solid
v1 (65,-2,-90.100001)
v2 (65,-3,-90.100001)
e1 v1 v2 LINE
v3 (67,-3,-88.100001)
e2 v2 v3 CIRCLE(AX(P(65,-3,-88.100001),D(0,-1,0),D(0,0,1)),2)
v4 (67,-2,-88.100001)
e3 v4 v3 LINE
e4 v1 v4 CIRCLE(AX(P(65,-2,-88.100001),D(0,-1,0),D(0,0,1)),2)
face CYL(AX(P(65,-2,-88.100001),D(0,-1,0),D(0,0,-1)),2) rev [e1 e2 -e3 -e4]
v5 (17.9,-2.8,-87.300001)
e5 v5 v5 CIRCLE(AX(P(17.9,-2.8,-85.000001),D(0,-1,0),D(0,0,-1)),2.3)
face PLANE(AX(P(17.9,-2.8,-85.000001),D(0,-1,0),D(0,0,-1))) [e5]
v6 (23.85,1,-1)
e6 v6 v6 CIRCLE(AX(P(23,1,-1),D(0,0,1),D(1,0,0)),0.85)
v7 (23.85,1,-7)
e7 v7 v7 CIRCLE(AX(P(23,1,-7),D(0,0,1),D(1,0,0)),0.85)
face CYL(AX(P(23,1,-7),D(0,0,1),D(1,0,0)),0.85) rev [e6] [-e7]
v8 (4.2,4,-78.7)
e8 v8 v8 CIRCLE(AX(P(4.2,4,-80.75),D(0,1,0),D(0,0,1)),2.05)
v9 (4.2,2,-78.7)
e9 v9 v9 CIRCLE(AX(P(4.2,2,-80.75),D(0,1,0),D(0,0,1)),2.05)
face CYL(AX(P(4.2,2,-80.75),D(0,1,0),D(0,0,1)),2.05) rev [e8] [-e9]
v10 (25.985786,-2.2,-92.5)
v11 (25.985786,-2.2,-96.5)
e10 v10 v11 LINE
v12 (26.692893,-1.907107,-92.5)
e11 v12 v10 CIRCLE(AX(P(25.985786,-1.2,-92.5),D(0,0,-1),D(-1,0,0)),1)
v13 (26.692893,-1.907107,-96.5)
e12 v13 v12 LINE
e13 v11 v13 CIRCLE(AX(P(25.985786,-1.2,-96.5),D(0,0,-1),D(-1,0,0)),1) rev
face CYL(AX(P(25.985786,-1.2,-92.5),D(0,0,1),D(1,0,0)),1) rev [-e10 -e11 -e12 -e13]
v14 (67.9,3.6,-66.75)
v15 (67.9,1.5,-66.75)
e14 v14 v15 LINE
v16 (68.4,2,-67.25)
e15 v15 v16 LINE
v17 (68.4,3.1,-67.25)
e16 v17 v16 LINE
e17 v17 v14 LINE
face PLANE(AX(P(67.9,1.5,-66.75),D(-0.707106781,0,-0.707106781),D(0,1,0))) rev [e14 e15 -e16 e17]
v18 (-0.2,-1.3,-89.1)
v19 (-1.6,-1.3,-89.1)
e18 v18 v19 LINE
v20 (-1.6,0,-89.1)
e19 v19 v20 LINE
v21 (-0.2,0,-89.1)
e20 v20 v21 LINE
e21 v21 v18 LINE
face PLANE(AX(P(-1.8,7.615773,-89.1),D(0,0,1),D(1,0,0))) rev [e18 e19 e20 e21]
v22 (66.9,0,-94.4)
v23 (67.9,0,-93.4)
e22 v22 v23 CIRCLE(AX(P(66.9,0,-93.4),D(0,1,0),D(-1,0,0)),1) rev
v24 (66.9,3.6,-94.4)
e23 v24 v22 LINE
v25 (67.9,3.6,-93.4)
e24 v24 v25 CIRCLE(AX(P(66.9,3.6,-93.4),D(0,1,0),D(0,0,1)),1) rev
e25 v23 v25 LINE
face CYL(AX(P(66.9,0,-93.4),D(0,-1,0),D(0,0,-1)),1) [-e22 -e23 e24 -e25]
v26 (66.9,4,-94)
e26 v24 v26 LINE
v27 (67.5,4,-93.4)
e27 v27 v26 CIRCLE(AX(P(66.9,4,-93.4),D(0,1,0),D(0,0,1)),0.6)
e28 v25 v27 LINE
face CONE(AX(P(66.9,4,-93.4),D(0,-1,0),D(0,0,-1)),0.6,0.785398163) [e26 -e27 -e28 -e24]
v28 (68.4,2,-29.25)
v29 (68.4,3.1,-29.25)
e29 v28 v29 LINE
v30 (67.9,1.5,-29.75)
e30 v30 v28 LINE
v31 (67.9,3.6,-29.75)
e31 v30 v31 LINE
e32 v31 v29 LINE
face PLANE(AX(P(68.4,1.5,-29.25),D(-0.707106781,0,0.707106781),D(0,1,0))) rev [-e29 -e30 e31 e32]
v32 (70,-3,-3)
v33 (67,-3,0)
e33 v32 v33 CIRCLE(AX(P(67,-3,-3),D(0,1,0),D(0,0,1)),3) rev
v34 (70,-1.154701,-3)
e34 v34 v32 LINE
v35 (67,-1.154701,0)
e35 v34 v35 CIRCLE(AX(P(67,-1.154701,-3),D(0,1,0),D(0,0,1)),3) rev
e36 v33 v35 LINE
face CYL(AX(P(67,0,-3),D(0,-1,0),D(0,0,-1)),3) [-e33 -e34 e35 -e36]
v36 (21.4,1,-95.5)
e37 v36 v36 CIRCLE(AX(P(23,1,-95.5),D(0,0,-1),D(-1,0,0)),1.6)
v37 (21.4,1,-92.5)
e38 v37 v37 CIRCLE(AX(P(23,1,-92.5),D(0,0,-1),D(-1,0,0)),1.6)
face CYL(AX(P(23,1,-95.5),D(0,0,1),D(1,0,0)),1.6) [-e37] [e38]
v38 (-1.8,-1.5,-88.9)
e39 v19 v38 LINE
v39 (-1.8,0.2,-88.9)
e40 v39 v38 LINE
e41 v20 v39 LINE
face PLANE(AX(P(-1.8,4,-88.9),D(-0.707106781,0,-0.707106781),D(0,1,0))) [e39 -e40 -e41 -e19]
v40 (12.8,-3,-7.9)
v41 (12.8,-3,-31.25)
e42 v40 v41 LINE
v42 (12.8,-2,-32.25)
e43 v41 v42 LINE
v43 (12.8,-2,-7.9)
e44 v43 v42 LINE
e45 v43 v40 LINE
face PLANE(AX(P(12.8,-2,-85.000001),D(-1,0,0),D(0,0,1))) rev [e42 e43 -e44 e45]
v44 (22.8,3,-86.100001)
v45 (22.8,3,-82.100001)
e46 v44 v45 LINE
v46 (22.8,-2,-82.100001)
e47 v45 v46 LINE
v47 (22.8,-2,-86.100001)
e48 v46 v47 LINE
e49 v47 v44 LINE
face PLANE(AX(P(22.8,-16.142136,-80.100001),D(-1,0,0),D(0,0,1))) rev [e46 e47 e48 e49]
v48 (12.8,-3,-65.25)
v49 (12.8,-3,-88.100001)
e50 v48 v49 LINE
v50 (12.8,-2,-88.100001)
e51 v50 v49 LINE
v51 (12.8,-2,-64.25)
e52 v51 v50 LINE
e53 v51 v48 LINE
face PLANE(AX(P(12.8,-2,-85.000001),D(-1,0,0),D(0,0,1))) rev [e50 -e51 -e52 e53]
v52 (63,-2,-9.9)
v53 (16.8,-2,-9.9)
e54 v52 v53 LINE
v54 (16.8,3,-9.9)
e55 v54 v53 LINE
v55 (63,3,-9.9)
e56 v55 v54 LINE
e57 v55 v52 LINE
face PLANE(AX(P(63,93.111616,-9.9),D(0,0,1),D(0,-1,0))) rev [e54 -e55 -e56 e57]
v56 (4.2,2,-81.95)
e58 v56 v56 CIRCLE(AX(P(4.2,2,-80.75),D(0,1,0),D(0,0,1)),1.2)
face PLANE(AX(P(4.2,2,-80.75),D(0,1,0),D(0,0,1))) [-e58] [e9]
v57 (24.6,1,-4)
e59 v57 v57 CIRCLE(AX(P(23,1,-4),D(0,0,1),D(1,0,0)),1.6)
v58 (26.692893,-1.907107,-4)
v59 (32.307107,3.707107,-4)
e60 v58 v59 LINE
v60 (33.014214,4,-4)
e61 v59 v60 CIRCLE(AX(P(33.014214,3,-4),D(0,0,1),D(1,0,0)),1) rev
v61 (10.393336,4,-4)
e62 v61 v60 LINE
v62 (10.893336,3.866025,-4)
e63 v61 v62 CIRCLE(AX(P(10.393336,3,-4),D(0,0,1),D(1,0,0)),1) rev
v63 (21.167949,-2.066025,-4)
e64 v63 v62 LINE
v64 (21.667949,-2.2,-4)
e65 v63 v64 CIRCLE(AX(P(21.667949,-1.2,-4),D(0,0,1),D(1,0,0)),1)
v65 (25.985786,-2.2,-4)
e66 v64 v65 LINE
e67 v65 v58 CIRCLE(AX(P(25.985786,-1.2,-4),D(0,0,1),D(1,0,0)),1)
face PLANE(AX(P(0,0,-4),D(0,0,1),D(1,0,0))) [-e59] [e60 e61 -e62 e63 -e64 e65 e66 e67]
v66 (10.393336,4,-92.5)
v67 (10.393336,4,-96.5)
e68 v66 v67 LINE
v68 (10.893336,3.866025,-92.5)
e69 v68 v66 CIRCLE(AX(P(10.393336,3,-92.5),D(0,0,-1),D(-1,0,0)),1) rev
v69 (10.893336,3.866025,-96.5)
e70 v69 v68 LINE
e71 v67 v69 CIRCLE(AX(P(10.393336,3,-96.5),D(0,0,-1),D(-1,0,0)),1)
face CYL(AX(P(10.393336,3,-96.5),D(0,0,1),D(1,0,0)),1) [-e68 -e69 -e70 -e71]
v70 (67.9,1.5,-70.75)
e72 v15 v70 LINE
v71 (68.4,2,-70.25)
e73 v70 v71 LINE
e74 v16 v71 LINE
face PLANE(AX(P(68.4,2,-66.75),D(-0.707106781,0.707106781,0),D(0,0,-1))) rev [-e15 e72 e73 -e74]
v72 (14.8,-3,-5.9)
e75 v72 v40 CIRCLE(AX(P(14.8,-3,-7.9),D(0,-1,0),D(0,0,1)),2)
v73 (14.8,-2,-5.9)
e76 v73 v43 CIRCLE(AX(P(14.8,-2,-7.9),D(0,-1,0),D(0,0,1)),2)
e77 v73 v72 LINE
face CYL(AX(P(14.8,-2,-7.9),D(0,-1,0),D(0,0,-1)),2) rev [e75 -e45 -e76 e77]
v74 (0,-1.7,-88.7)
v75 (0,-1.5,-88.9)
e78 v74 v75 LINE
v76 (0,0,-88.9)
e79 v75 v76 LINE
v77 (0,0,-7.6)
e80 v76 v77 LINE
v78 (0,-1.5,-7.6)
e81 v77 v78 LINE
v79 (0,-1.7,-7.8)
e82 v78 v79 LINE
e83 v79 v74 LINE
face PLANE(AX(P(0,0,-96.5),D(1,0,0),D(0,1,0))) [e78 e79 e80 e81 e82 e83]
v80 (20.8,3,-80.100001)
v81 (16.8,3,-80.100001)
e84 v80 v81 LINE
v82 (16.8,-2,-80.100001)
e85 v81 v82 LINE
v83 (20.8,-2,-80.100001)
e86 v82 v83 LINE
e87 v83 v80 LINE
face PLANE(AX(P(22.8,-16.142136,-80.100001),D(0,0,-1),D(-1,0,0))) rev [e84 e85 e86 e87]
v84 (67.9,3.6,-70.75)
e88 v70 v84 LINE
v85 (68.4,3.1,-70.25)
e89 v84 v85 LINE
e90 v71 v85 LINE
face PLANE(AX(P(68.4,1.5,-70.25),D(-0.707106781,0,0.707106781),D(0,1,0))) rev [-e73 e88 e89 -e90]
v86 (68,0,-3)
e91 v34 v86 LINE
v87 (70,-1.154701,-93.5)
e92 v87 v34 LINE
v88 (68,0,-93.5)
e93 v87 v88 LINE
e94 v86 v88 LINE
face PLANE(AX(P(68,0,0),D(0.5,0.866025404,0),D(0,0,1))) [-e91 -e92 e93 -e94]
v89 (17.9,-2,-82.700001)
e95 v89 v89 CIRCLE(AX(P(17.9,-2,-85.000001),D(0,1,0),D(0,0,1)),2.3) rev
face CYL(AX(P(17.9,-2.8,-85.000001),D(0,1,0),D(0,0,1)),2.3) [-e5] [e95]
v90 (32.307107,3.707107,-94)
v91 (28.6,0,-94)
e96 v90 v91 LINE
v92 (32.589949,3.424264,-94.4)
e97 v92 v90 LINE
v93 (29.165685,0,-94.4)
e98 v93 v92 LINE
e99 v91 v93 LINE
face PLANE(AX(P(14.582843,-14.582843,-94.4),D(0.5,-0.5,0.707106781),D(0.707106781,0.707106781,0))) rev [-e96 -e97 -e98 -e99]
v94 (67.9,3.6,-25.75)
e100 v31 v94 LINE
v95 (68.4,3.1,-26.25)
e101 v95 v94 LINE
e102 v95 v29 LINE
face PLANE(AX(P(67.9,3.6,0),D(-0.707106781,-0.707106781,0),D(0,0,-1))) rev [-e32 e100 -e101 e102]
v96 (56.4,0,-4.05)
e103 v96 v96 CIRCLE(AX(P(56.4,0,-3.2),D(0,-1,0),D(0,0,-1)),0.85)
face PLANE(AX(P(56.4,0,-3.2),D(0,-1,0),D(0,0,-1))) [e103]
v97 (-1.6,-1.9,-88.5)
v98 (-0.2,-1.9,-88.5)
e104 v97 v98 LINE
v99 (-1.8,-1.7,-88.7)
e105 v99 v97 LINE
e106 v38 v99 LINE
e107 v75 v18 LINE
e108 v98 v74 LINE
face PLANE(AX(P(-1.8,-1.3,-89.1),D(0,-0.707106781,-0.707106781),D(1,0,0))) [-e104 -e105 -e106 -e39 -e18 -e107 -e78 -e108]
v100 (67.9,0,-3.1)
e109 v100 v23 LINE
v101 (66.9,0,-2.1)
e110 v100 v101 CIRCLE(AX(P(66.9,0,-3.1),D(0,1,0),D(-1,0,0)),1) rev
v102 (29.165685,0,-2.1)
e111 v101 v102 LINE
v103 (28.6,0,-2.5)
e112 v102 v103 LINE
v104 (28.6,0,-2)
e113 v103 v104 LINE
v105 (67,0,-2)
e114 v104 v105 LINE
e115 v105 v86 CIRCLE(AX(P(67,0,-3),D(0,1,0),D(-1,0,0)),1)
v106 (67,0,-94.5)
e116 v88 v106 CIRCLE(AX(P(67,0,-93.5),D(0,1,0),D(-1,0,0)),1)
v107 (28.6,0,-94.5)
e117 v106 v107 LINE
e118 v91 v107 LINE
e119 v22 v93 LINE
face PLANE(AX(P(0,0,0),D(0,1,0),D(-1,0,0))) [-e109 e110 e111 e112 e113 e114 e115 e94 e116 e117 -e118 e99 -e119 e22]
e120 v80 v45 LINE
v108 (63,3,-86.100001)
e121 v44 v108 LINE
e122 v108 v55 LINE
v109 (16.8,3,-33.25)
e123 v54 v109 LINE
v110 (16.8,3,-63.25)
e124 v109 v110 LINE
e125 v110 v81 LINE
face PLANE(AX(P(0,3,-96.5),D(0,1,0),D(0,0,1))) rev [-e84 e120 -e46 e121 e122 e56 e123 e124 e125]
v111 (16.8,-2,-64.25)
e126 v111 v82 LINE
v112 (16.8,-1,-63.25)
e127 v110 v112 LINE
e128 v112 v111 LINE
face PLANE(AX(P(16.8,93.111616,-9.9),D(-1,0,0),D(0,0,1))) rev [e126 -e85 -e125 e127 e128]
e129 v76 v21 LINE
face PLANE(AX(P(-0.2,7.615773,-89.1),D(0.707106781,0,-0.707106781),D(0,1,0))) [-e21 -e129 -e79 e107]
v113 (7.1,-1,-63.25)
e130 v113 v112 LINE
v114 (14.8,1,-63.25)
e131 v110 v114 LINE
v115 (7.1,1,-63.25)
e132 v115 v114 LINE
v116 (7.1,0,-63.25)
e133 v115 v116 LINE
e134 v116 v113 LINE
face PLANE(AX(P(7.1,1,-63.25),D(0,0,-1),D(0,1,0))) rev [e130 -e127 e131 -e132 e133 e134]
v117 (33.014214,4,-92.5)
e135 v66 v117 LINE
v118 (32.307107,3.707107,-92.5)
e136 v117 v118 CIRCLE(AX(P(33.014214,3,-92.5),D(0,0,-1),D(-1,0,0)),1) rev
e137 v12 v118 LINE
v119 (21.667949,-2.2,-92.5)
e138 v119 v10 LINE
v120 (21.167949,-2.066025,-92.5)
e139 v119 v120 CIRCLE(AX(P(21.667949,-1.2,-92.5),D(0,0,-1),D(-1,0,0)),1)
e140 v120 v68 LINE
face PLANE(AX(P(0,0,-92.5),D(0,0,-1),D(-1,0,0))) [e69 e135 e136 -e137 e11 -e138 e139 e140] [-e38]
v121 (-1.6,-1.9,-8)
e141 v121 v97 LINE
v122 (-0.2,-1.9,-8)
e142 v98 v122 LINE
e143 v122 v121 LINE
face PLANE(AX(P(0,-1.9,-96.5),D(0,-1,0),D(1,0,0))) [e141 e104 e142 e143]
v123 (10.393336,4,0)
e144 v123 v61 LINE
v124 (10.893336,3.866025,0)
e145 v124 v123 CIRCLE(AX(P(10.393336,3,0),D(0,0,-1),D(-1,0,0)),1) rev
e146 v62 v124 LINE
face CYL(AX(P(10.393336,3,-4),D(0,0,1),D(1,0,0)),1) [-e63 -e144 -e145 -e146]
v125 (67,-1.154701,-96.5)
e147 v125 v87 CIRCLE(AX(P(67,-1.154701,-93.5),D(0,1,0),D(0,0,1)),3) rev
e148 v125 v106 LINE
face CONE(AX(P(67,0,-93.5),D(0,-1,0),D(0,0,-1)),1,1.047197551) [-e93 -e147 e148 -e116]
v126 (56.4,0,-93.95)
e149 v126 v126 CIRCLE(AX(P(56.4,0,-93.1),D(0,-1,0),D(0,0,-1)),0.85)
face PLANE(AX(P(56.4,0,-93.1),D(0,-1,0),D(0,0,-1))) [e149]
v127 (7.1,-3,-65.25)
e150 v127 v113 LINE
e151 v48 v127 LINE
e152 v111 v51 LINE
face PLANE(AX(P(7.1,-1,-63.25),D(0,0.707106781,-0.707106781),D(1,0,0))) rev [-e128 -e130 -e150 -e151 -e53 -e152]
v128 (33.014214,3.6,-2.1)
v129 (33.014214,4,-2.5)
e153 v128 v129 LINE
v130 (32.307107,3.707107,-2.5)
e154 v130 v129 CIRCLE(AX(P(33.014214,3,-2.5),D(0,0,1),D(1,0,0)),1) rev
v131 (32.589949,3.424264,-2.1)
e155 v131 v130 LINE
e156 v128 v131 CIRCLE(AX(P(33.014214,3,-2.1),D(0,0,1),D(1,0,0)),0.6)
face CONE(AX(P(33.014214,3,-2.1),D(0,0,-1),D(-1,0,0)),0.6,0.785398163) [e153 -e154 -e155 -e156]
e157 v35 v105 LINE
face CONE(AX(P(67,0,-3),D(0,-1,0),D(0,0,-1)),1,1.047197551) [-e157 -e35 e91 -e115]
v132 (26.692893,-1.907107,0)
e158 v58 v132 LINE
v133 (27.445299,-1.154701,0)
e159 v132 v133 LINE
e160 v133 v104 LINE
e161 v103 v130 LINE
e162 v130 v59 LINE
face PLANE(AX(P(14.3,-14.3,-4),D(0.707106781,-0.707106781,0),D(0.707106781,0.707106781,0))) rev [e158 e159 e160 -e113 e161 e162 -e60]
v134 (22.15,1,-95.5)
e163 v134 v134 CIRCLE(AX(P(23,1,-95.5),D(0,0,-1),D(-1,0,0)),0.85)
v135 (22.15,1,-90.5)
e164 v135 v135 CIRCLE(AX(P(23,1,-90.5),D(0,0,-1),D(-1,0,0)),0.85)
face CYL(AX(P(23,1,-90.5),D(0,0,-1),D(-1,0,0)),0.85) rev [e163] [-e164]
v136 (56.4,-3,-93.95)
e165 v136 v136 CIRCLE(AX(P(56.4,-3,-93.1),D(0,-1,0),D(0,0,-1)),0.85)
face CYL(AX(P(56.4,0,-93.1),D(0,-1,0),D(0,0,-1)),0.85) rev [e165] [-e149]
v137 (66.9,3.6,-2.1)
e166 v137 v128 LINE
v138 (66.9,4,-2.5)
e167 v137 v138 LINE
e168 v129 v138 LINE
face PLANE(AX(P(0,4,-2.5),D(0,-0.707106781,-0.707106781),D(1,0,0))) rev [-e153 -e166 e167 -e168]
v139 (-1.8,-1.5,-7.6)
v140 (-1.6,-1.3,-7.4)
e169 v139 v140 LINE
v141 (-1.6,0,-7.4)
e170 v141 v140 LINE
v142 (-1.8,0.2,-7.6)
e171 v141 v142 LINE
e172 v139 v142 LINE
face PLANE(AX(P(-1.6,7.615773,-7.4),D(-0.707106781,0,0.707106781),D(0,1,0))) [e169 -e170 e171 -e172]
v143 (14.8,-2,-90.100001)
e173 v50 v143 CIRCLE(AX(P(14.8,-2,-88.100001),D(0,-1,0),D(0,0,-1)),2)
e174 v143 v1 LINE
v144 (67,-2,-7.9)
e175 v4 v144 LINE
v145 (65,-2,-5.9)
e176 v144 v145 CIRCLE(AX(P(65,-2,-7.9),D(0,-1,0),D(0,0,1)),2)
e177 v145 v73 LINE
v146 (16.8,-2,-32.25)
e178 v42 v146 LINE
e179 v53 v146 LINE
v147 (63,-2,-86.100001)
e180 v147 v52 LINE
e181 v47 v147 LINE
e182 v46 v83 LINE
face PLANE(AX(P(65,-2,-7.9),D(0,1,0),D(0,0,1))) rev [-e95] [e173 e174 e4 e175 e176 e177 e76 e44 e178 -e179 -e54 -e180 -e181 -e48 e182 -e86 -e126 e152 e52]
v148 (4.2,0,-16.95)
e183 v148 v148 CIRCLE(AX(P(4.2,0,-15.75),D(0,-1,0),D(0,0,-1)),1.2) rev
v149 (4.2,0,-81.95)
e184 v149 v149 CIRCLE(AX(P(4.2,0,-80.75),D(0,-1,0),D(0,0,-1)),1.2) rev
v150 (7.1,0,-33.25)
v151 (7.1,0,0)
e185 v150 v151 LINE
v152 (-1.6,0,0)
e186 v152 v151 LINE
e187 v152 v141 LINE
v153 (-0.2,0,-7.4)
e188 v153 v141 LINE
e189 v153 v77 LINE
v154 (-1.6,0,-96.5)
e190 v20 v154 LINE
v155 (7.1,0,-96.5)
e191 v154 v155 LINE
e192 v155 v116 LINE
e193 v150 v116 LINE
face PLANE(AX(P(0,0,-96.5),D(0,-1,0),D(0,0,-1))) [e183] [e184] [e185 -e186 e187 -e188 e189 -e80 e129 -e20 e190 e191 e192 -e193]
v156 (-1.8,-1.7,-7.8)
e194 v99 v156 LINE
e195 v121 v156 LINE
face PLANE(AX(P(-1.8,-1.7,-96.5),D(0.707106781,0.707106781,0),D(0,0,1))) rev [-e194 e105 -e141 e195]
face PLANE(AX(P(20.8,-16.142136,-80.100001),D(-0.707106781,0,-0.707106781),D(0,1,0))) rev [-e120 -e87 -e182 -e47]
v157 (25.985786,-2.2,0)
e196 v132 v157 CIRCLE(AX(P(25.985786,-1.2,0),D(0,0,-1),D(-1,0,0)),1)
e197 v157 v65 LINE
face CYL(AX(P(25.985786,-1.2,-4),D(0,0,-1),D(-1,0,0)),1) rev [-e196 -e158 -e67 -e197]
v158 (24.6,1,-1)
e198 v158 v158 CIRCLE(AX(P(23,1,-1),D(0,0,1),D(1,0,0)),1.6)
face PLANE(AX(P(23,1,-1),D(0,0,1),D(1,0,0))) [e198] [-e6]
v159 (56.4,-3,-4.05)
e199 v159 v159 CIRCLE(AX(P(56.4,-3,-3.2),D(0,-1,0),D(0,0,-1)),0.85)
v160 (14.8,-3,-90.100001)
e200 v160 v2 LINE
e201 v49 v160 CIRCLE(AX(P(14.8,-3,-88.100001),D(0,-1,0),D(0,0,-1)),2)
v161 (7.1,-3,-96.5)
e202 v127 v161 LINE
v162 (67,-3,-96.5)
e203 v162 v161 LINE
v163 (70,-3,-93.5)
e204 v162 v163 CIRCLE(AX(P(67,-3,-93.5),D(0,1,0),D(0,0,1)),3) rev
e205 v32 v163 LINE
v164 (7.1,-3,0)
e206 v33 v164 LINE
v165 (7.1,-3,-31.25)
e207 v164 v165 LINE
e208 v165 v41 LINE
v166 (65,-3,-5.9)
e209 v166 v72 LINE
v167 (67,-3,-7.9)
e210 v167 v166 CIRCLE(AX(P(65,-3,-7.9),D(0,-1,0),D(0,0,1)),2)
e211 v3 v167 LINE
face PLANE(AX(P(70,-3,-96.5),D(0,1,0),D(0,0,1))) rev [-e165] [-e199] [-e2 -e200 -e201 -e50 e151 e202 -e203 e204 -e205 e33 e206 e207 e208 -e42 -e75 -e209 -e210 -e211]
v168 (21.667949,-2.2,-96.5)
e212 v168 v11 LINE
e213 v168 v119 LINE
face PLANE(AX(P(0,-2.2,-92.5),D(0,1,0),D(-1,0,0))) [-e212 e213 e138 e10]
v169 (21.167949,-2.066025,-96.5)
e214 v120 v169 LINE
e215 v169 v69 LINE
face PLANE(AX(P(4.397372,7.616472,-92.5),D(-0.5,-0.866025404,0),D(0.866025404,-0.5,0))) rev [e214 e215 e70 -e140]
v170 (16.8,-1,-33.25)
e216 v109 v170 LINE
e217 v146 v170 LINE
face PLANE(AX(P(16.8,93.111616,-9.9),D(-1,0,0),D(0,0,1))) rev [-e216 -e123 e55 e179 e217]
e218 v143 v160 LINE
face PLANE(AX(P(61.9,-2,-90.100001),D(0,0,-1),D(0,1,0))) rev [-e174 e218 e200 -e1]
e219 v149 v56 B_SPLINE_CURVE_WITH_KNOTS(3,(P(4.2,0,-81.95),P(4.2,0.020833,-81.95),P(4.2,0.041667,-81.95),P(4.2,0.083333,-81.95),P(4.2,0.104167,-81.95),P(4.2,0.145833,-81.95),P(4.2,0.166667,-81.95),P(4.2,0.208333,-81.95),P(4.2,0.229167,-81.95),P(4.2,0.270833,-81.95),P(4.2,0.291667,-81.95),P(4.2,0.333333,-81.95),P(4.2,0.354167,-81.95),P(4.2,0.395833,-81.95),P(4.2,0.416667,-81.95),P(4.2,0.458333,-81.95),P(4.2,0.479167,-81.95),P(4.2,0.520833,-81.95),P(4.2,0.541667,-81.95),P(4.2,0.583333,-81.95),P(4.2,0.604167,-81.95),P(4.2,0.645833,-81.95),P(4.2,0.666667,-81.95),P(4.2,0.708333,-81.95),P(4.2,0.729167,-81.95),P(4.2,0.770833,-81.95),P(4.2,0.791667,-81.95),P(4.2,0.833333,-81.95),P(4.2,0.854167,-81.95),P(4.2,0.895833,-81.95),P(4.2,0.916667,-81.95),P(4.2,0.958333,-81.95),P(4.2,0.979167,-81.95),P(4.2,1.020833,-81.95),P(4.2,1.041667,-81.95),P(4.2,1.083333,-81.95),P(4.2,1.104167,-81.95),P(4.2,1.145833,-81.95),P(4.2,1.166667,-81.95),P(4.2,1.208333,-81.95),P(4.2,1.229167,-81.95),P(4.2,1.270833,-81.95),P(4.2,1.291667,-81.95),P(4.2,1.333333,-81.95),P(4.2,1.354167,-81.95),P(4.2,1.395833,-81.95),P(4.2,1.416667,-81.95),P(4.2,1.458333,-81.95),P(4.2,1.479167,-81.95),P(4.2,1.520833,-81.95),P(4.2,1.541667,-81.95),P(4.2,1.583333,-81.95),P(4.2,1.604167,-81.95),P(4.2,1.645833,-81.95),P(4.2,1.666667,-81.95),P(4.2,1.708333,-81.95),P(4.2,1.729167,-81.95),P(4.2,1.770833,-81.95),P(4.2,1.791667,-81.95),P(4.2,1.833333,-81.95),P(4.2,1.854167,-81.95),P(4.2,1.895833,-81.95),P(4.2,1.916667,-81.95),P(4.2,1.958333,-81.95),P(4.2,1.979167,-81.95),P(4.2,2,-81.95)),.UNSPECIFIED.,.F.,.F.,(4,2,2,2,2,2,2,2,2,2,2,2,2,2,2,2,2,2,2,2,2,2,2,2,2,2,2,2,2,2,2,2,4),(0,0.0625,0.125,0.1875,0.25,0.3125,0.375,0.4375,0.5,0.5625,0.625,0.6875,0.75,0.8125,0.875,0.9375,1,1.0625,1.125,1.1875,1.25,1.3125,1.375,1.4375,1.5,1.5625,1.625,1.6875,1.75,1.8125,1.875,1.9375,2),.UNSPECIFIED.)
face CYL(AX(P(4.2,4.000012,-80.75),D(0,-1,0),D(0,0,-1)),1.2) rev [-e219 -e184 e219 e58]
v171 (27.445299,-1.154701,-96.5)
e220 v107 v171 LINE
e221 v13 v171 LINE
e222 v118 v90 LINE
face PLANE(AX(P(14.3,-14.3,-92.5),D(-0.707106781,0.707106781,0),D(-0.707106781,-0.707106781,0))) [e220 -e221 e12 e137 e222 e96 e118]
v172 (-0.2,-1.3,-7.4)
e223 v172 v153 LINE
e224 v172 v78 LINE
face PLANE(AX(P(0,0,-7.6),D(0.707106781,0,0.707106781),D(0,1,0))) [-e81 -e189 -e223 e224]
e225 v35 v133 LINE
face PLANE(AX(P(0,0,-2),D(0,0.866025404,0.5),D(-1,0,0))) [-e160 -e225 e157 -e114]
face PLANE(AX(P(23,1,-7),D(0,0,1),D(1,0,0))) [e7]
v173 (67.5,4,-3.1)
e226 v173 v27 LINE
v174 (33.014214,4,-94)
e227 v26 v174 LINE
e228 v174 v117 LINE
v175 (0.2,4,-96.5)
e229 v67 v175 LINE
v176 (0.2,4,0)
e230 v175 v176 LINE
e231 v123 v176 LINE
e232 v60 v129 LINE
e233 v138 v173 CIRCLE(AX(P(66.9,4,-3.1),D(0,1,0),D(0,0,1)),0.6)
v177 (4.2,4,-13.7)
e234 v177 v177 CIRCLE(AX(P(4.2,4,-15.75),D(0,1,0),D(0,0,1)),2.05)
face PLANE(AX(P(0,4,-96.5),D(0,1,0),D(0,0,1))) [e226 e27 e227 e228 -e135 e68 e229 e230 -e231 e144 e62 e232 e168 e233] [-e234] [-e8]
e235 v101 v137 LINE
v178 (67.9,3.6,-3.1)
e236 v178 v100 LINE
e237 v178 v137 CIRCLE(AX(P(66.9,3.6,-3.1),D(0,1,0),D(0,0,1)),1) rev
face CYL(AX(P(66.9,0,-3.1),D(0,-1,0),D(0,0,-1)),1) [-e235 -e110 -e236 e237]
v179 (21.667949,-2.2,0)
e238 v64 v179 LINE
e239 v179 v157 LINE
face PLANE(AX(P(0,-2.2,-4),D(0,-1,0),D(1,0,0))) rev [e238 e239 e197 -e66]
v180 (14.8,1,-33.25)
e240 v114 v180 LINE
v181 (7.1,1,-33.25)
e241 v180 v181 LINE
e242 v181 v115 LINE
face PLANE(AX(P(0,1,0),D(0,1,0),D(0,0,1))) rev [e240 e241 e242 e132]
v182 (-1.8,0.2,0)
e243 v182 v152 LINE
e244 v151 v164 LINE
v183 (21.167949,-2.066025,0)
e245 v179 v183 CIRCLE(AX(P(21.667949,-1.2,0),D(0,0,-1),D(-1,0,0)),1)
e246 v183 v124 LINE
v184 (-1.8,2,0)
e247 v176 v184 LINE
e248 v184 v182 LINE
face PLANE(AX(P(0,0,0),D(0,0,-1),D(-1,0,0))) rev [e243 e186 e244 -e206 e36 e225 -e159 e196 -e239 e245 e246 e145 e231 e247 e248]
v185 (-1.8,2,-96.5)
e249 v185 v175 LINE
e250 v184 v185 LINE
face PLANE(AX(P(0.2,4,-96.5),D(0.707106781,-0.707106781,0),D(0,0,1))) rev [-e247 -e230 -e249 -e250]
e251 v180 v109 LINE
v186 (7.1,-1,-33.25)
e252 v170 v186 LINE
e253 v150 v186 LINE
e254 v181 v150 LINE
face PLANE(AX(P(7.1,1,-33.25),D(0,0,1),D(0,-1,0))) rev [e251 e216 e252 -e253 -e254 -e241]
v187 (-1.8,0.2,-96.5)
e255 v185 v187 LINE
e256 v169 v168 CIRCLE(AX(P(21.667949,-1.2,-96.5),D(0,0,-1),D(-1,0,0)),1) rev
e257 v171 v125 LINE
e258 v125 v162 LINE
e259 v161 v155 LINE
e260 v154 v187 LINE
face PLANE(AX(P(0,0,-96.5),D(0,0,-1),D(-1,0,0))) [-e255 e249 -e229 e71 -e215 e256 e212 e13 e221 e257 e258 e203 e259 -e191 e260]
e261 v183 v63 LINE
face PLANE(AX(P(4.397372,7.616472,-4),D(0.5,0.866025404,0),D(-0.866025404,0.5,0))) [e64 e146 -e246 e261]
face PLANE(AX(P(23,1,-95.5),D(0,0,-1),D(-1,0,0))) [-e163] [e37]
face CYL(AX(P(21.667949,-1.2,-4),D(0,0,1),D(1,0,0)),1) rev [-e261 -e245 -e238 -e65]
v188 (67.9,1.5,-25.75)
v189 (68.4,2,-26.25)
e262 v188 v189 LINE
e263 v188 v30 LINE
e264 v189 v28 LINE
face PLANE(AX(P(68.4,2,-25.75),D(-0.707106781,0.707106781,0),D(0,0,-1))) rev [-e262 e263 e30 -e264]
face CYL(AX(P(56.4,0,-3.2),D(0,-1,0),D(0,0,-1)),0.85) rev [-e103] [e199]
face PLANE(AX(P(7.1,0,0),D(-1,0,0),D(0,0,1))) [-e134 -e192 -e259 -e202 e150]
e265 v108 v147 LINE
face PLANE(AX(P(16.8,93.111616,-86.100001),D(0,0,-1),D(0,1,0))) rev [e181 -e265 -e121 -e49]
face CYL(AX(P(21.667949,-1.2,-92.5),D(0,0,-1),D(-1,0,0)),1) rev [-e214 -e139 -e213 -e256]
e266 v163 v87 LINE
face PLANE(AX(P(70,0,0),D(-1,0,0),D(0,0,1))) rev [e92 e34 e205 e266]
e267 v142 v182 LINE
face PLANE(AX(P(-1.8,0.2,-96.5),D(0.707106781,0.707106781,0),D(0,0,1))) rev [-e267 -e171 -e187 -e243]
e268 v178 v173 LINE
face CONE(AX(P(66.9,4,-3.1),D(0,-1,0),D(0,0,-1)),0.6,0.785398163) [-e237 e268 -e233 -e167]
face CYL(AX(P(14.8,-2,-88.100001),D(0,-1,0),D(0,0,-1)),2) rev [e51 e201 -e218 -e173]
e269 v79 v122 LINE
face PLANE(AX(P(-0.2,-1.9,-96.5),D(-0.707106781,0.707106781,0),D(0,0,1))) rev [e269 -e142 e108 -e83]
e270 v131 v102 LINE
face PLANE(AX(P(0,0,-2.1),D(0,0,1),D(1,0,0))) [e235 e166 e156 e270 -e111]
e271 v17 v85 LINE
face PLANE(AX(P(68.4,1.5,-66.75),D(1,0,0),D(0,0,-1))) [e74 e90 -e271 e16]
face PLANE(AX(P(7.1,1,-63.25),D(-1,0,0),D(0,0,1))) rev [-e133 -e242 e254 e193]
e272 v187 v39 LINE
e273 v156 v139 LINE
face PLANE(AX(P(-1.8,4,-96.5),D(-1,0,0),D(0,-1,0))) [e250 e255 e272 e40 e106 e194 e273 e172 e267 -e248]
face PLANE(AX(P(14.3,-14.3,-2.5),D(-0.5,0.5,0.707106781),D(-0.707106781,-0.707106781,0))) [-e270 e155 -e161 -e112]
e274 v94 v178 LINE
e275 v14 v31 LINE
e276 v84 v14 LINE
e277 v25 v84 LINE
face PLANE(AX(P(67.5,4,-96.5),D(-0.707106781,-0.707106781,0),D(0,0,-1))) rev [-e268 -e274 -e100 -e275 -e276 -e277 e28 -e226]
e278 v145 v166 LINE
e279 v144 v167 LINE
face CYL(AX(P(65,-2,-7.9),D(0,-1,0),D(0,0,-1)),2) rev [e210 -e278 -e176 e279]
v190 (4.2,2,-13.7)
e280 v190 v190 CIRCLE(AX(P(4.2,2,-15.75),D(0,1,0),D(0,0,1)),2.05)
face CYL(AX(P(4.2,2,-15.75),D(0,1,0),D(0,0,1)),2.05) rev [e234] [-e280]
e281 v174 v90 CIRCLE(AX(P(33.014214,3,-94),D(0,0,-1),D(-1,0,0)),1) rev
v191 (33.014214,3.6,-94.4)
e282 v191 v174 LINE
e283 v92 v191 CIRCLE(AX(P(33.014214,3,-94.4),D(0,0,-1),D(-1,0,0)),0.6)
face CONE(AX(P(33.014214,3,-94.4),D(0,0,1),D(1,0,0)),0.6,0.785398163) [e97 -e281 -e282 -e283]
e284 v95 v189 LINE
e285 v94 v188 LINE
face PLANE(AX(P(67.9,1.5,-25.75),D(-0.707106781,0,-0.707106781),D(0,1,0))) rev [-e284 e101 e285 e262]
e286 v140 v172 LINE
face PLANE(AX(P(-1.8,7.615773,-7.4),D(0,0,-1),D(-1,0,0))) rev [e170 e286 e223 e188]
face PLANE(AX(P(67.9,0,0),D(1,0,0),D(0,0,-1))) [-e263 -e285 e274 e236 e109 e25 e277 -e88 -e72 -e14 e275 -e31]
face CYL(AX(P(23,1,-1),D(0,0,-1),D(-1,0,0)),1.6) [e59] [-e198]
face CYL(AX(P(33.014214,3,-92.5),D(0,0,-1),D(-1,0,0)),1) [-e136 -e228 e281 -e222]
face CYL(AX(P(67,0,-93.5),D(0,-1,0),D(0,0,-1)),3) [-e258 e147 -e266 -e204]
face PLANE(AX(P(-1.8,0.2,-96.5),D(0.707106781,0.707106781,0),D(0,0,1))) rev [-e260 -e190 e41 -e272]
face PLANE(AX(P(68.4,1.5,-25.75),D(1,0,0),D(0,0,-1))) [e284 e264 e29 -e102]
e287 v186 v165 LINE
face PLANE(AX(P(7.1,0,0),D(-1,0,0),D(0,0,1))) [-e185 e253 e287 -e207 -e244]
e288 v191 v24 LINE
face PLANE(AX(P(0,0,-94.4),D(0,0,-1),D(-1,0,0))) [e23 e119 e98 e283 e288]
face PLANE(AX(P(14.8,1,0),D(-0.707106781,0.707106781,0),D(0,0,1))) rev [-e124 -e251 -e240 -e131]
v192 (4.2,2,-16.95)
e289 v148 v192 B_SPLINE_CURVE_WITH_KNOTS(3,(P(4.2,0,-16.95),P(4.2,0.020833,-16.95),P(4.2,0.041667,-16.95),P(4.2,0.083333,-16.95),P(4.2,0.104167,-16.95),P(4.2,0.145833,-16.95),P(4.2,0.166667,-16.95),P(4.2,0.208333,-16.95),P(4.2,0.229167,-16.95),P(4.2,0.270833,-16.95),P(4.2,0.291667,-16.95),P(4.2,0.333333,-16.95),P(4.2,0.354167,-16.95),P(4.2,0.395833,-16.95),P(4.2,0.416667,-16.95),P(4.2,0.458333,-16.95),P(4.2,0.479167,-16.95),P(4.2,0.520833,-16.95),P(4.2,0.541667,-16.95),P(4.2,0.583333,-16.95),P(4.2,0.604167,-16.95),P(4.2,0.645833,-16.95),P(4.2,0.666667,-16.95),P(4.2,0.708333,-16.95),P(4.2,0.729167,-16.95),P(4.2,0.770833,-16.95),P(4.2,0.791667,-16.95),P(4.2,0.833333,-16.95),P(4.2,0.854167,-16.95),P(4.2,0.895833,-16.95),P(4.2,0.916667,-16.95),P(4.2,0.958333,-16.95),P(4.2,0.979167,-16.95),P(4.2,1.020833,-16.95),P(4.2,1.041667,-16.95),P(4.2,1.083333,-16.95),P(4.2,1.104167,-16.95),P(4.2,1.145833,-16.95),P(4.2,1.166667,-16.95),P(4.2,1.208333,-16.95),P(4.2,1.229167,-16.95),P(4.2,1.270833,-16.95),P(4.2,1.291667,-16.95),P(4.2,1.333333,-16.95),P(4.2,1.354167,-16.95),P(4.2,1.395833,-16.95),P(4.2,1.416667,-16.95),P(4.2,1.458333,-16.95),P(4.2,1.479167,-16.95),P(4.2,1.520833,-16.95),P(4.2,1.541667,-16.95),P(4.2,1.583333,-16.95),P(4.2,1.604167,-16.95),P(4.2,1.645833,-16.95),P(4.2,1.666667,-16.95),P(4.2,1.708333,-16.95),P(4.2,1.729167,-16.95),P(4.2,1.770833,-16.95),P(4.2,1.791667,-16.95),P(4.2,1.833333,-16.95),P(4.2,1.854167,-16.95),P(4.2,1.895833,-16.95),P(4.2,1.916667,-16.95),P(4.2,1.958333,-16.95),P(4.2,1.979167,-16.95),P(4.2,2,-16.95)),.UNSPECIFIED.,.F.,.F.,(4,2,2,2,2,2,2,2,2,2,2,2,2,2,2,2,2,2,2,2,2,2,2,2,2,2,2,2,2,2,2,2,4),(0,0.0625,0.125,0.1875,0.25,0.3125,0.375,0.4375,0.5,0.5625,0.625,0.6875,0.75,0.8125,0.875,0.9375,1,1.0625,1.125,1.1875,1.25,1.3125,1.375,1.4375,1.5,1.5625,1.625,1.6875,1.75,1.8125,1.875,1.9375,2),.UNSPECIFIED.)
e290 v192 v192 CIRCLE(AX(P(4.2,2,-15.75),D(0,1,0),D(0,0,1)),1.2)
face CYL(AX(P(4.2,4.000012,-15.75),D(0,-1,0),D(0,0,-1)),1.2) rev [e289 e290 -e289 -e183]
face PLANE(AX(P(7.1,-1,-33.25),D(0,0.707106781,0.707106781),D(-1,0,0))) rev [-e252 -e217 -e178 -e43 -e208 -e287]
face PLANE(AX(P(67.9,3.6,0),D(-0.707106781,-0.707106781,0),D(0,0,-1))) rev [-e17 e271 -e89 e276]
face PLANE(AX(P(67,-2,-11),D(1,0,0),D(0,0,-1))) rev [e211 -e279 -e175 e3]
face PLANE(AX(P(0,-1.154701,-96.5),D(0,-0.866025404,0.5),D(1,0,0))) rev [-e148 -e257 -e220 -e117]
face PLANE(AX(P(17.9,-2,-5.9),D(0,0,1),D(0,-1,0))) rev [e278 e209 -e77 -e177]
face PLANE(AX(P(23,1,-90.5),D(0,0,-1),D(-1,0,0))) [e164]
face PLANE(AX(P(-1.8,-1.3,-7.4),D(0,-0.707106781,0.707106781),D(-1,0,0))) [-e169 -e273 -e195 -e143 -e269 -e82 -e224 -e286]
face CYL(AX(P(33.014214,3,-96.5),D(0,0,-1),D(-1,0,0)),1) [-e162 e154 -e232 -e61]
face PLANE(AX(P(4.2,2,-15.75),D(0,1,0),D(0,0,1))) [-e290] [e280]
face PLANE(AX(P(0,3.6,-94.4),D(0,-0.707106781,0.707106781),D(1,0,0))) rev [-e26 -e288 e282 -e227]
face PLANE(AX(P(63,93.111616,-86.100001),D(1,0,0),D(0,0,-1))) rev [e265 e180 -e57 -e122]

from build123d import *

# Parameters (mm, degrees)
EXTRUDE_1_DEPTH          = 96.5
CUT_EXTRUDE_1_DEPTH      = 97.940548792
CUT_EXTRUDE_1_DEPTH_BACK = 10
SKETCH_2_R               = 1.2
SKETCH_2_3_R             = 2.05
CUT_EXTRUDE_2_DEPTH      = 2
CHAMFER_3_SIZE           = 2
SKETCH_3_W               = 1.8
SKETCH_3_H               = 7.4
CUT_EXTRUDE_3_DEPTH      = 1.9
CHAMFER_4_SIZE           = 0.2
CHAMFER_5_SIZE           = 0.6
SKETCH_5_W               = 96.5
SKETCH_5_H               = 7
EXTRUDE_3_DEPTH          = 62.9
CUT_EXTRUDE_4_DEPTH      = 1
SKETCH_7_W               = 2.1
SKETCH_7_H               = 4
CUT_EXTRUDE_5_DEPTH      = 120.282228349
CUT_EXTRUDE_6_DEPTH      = 2.1
SKETCH_7_4_R             = 1.6
SKETCH_7_4_R_2           = 0.85
CUT_EXTRUDE_7_DEPTH      = 4
CUT_EXTRUDE_START        = -96.5
CUT_EXTRUDE_8_DEPTH      = 2.1
CUT_EXTRUDE_9_DEPTH      = 4
FILLET_1_R               = 3
FILLET_2_R               = 1
CHAMFER_6_SIZE           = 2
CHAMFER_6_SIZE2          = 1.154700538
FILLET_3_R               = 1
EXTRUDE_START            = -4
SKETCH_7_9_R             = 1.6
EXTRUDE_4_DEPTH          = 3
SKETCH_7_10_R            = 0.85
CUT_EXTRUDE_10_DEPTH     = 6
EXTRUDE_START_2          = -92.5
SKETCH_7_11_R            = 1.6
SKETCH_7_11_R_2          = 0.85
EXTRUDE_5_DEPTH          = 3
CUT_EXTRUDE_START_2      = -89.5
SKETCH_7_12_R            = 0.85
CUT_EXTRUDE_11_DEPTH     = 6
SKETCH_8_W               = 46.199999762
SKETCH_8_H               = 76.200000954
CUT_EXTRUDE_12_DEPTH     = 5
CHAMFER_7_SIZE           = 0.4
SKETCH_10_W              = 9.700000238
SKETCH_10_H              = 30
CUT_EXTRUDE_13_DEPTH     = 4
CHAMFER_8_SIZE           = 2
SKETCH_12_W              = 10
SKETCH_12_H              = 10
EXTRUDE_6_DEPTH          = 5
CHAMFER_9_SIZE           = 2
SKETCH_13_R              = 2.3
EXTRUDE_7_DEPTH          = 0.8
SKETCH_14_R              = 0.85
CUT_EXTRUDE_14_DEPTH     = 3
EXTRUDE_START_3          = -0.9
SKETCH_15_W              = 5
SKETCH_15_H              = 4
EXTRUDE_8_DEPTH          = 1.6
CHAMFER_10_SIZE          = 0.5
CHAMFER_11_SIZE          = 0.5


# Read off the part's stored shape, not the designer's step: 切除-拉伸9
# Some blends are built 0.0001 mm under size
with BuildPart() as part:
    # 草图1 → 凸台-拉伸1 (new body)
    with BuildSketch(Plane.XY):
        Polygon((0, 0), (7.1, 0), (7.1, 4), (0, 4), (-1.8, 4), (-1.8, -1.9), (0, -1.9), align=None)
    extrude(amount=-EXTRUDE_1_DEPTH)

    # 草图2 → 切除-拉伸1 (cut, two sides: drawn at the far end of the back side and taken through both)
    with BuildSketch(Plane(origin=(0, 4, 0), x_dir=(1, 0, 0), z_dir=(0, 1, 0)).offset(-CUT_EXTRUDE_1_DEPTH_BACK)):
        with Locations(Location((4.2, 80.75, 0), (0, 0, 90))):
            Circle(SKETCH_2_R)
        with Locations(Location((4.2, 15.75, 0), (0, 0, 90))):
            Circle(SKETCH_2_R)
    extrude(amount=CUT_EXTRUDE_1_DEPTH + CUT_EXTRUDE_1_DEPTH_BACK, mode=Mode.SUBTRACT)

    # 草图2<3> → 切除-拉伸2 (cut)
    with BuildSketch(Plane(origin=(0, 4, 0), x_dir=(1, 0, 0), z_dir=(0, 1, 0))):
        with Locations(Location((4.2, 80.75, 0), (0, 0, 270))):
            Circle(SKETCH_2_3_R)
        with Locations(Location((4.2, 15.75, 0), (0, 0, 270))):
            Circle(SKETCH_2_3_R)
    extrude(amount=-CUT_EXTRUDE_2_DEPTH, mode=Mode.SUBTRACT)

    # 倒角3
    chamfer_3_edges = [part.edges().sort_by_distance(p)[0] for p in [
        (-1.8, 4, -48.25),
    ]]
    chamfer(chamfer_3_edges, length=CHAMFER_3_SIZE)

    # 草图3 → 切除-拉伸3 (cut)
    with BuildSketch(Plane.XZ.offset(1.9)):
        with Locations((-0.9, -92.8)):
            Rectangle(SKETCH_3_W, SKETCH_3_H)
        with Locations((-0.9, -3.7)):
            Rectangle(SKETCH_3_W, SKETCH_3_H)
    extrude(amount=-CUT_EXTRUDE_3_DEPTH, mode=Mode.SUBTRACT)

    # 倒角4
    chamfer_4_edges = [part.edges().sort_by_distance(p)[0] for p in [
        (-1.8, -1.9, -48.25),
        (0, -1.9, -48.25),
        (-1.8, -0.95, -89.1),
        (0, -0.95, -89.1),
        (-1.8, 0, -92.8),
        (-1.8, -0.95, -7.4),
        (0, -0.95, -7.4),
        (-1.8, 0, -3.7),
    ]]
    chamfer(chamfer_4_edges, length=CHAMFER_4_SIZE)

    # 倒角5
    # the kernel refuses this chamfer: 0.6 mm, written as the material it takes off along each edge
    with BuildSketch(Plane(origin=(1.343009793, -1.9, -89.1), x_dir=(0, 0.9996219169112965, -0.027495876610595982), z_dir=(-1, 0, 0))) as chamfer_5_piece_1:
        Polygon((CHAMFER_5_SIZE * 0.999621916911, -CHAMFER_5_SIZE * 0.0274958766106), (-CHAMFER_5_SIZE * 0.0274958766106, -CHAMFER_5_SIZE * 0.999621916911), (0, 0), align=None)
    extrude(amount=4.486019586, mode=Mode.SUBTRACT)
    with BuildSketch(Plane(origin=(1.343009793, -1.9, -7.4), x_dir=(0, 0.9996219169112968, 0.027495876610585925), z_dir=(-1, 0, 0))) as chamfer_5_piece_2:
        Polygon((CHAMFER_5_SIZE * 0.999621916911, CHAMFER_5_SIZE * 0.0274958766106), (-CHAMFER_5_SIZE * 0.0274958766106, CHAMFER_5_SIZE * 0.999621916911), (0, 0), align=None)
    extrude(amount=4.486019586, mode=Mode.SUBTRACT)

    # 草图5 → 凸台-拉伸3 (add)
    with BuildSketch(Plane(origin=(7.1, 0, 0), x_dir=(0, 0, -1), z_dir=(1, 0, 0))):
        with Locations((48.25, 0.5)):
            Rectangle(SKETCH_5_W, SKETCH_5_H)
    extrude(amount=EXTRUDE_3_DEPTH)

    # 草图6 → 切除-拉伸4 (cut)
    with BuildSketch(Plane.XZ.offset(3)):
        with BuildLine():
            Line((61.9, -5.9), (17.900000238, -5.9))
            Line((17.900000238, -5.9), (14.800000238, -5.9))
            ThreePointArc((14.800000238, -5.9), (13.385786676, -6.485786438), (12.800000238, -7.9))
            Line((12.800000238, -7.9), (12.800000238, -11))
            Line((12.800000238, -11), (12.800000238, -85.000000954))
            Line((12.800000238, -85.000000954), (12.800000238, -88.100000954))
            ThreePointArc((12.800000238, -88.100000954), (13.385786676, -89.514214516), (14.800000238, -90.100000954))
            Line((14.800000238, -90.100000954), (17.900000238, -90.100000954))
            Line((17.900000238, -90.100000954), (61.9, -90.100000954))
            Line((61.9, -90.100000954), (65, -90.100000954))
            ThreePointArc((65, -90.100000954), (66.414213562, -89.514214516), (67, -88.100000954))
            Line((67, -88.100000954), (67, -85.000000954))
            Line((67, -85.000000954), (67, -11))
            Line((67, -11), (67, -7.9))
            ThreePointArc((67, -7.9), (66.414213562, -6.485786438), (65, -5.9))
            Line((65, -5.9), (61.9, -5.9))
        make_face()
    extrude(amount=-CUT_EXTRUDE_4_DEPTH, mode=Mode.SUBTRACT)

    # 草图7 → 切除-拉伸5 (cut, through all)
    with BuildSketch(Plane(origin=(0, 0, -96.5), x_dir=(-1, 0, 0), z_dir=(0, 0, -1))):
        with Locations((-68.95, 2)):
            Rectangle(SKETCH_7_W, SKETCH_7_H)
    extrude(amount=-CUT_EXTRUDE_5_DEPTH, mode=Mode.SUBTRACT)

    # 草图7<3> → 切除-拉伸6 (cut)
    with BuildSketch(Plane(origin=(0, 0, -96.5), x_dir=(-1, 0, 0), z_dir=(0, 0, -1))):
        Polygon((-32.6, 4), (-67.9, 4), (-67.9, 0), (-28.6, 0), align=None)
    extrude(amount=-CUT_EXTRUDE_6_DEPTH, mode=Mode.SUBTRACT)

    # 草图7<4> → 切除-拉伸7 (cut)
    # profile 1 of 3: a face of its own
    with BuildSketch(Plane(origin=(0, 0, -96.5), x_dir=(-1, 0, 0), z_dir=(0, 0, -1))):
        Polygon((-10.661284993, 4), (-32.6, 4), (-28.6, 0), (-26.4, -2.2), (-21.4, -2.2), align=None)
        with Locations((-23, 1)):
            Circle(SKETCH_7_4_R, mode=Mode.SUBTRACT)
    # profile 2 of 3: a face of its own
    with BuildSketch(Plane(origin=(0, 0, -96.5), x_dir=(-1, 0, 0), z_dir=(0, 0, -1))):
        with Locations((-23, 1)):
            Circle(SKETCH_7_4_R)
        with Locations((-23, 1)):
            Circle(SKETCH_7_4_R_2, mode=Mode.SUBTRACT)
    # profile 3 of 3: a face of its own
    with BuildSketch(Plane(origin=(0, 0, -96.5), x_dir=(-1, 0, 0), z_dir=(0, 0, -1))):
        with Locations((-23, 1)):
            Circle(SKETCH_7_4_R_2)
    extrude(amount=-CUT_EXTRUDE_7_DEPTH, mode=Mode.SUBTRACT)

    # 草图7<5> → 切除-拉伸8 (cut)
    with BuildSketch(Plane(origin=(0, 0, -96.5), x_dir=(-1, 0, 0), z_dir=(0, 0, -1)).offset(CUT_EXTRUDE_START)):
        Polygon((-32.6, 4), (-67.9, 4), (-67.9, 0), (-28.6, 0), align=None)
    extrude(amount=CUT_EXTRUDE_8_DEPTH, mode=Mode.SUBTRACT)

    # 切除-拉伸9 outline → 切除-拉伸9 (cut)
    with BuildSketch(Plane(origin=(0, 0, -96.5), x_dir=(-1, 0, 0), z_dir=(0, 0, -1)).offset(CUT_EXTRUDE_START)):
        Polygon((-10.661284993, 4), (-32.6, 4), (-26.4, -2.2), (-21.4, -2.2), align=None)
    extrude(amount=CUT_EXTRUDE_9_DEPTH, mode=Mode.SUBTRACT)

    # 圆角1
    fillet_1_edges = [part.edges().sort_by_distance(p)[0] for p in [
        (70, -1.5, -96.5),
        (70, -1.5, 0),
    ]]
    fillet(fillet_1_edges, radius=FILLET_1_R)

    # 圆角2
    fillet_2_edges = [part.edges().sort_by_distance(p)[0] for p in [
        (67.9, 2, -94.4),
        (67.9, 2, -2.1),
    ]]
    fillet(fillet_2_edges, radius=FILLET_2_R)

    # 倒角6
    chamfer_6_edges = [part.edges().sort_by_distance(p)[0] for p in [
        (47.8, 0, -96.5),
        (47.8, 0, 0),
        (70, 0, -48.25),
        (69.121320344, 0, -95.621320344),
        (69.121320344, 0, -0.878679656),
    ]]
    chamfer_6_side = [part.faces().sort_by_distance(p)[0] for p in [
        (47.75, 0, -1.049942383),
    ]]
    chamfer(chamfer_6_edges, length=CHAMFER_6_SIZE, length2=CHAMFER_6_SIZE2, reference=chamfer_6_side[0])

    # 圆角3
    fillet_3_edges = [part.edges().sort_by_distance(p)[0] for p in [
        (26.4, -2.2, -94.5),
        (32.6, 4, -93.45),
        (10.661284993, 4, -94.5),
        (21.4, -2.2, -94.5),
        (26.4, -2.2, -2),
        (21.4, -2.2, -2),
        (10.661284993, 4, -2),
        (32.6, 4, -3.05),
    ]]
    fillet(fillet_3_edges, radius=FILLET_3_R)

    # 草图7<9> → 凸台-拉伸4 (add)
    with BuildSketch(Plane(origin=(0, 0, -96.5), x_dir=(-1, 0, 0), z_dir=(0, 0, -1)).offset(EXTRUDE_START)):
        with Locations((-23, 1)):
            Circle(SKETCH_7_9_R)
    extrude(amount=EXTRUDE_4_DEPTH)

    # 草图7<10> → 切除-拉伸10 (cut)
    with BuildSketch(Plane(origin=(0, 0, -96.5), x_dir=(-1, 0, 0), z_dir=(0, 0, -1))):
        with Locations((-23, 1)):
            Circle(SKETCH_7_10_R)
    extrude(amount=-CUT_EXTRUDE_10_DEPTH, mode=Mode.SUBTRACT)

    # 草图7<11> → 凸台-拉伸5 (add)
    # profile 1 of 2: a face of its own
    with BuildSketch(Plane(origin=(0, 0, -96.5), x_dir=(-1, 0, 0), z_dir=(0, 0, -1)).offset(EXTRUDE_START_2)):
        with Locations((-23, 1)):
            Circle(SKETCH_7_11_R)
        with Locations((-23, 1)):
            Circle(SKETCH_7_11_R_2, mode=Mode.SUBTRACT)
    # profile 2 of 2: a face of its own
    with BuildSketch(Plane(origin=(0, 0, -96.5), x_dir=(-1, 0, 0), z_dir=(0, 0, -1)).offset(EXTRUDE_START_2)):
        with Locations((-23, 1)):
            Circle(SKETCH_7_11_R_2)
    extrude(amount=-EXTRUDE_5_DEPTH)

    # 草图7<12> → 切除-拉伸11 (cut)
    with BuildSketch(Plane(origin=(0, 0, -96.5), x_dir=(-1, 0, 0), z_dir=(0, 0, -1)).offset(CUT_EXTRUDE_START_2)):
        with Locations((-23, 1)):
            Circle(SKETCH_7_12_R)
    extrude(amount=-CUT_EXTRUDE_11_DEPTH, mode=Mode.SUBTRACT)

    # 草图8 → 切除-拉伸12 (cut)
    with BuildSketch(Plane.XZ.offset(2)):
        with Locations((39.900000119, -48.000000477)):
            Rectangle(SKETCH_8_W, SKETCH_8_H)
    extrude(amount=-CUT_EXTRUDE_12_DEPTH, mode=Mode.SUBTRACT)

    # 倒角7
    chamfer_7_edges = [part.edges().sort_by_distance(p)[0] for p in [
        (30.453553391, 1.853553391, -94.4),
        (30.453553391, 1.853553391, -2.1),
        (67.9, 4, -48.25),
        (67.607106781, 4, -94.107106781),
        (67.607106781, 4, -2.392893219),
        (49.957106781, 4, -2.1),
        (49.957106781, 4, -94.4),
        (32.63153013, 3.923879533, -2.1),
        (32.63153013, 3.923879533, -94.4),
    ]]
    chamfer(chamfer_7_edges, length=CHAMFER_7_SIZE)

    # 草图10 → 切除-拉伸13 (cut)
    with BuildSketch(Plane.XZ.offset(3)):
        with Locations((11.950000119, -48.25)):
            Rectangle(SKETCH_10_W, SKETCH_10_H)
    extrude(amount=-CUT_EXTRUDE_13_DEPTH, mode=Mode.SUBTRACT)

    # 倒角8
    chamfer_8_edges = [part.edges().sort_by_distance(p)[0] for p in [
        (16.800000238, 1, -48.25),
    ]]
    chamfer(chamfer_8_edges, length=CHAMFER_8_SIZE - 0.0001)  # a hair under: the kernel refuses the full size

    # 草图12 → 凸台-拉伸6 (add)
    with BuildSketch(Plane.XZ.offset(-3)):
        with Locations((17.800000238, -85.100000954)):
            Rectangle(SKETCH_12_W, SKETCH_12_H)
    extrude(amount=EXTRUDE_6_DEPTH)

    # 倒角9
    # the kernel refuses this chamfer: 2 mm, written as the material it takes off along each edge
    with BuildSketch(Plane(origin=(17.943366214, -3, -33.25), x_dir=(0, 0.9996219169112968, -0.027495876610585623), z_dir=(-1, 0, 0)), Plane(origin=(1.956634024, -3, -63.25), x_dir=(0, 0.9996219169112968, 0.027495876610585623), z_dir=(1, 0, 0))) as chamfer_9_piece_1:
        Polygon((CHAMFER_9_SIZE * 0.999621916911, -CHAMFER_9_SIZE * 0.0274958766106), (-CHAMFER_9_SIZE * 0.0274958766106, -CHAMFER_9_SIZE * 0.999621916911), (0, 0), align=None)
    extrude(amount=15.98673219, mode=Mode.SUBTRACT)
    with BuildSketch(Plane(origin=(22.800000238, 3, -80.100000954), x_dir=(0.02749587661058555, 0, -0.9996219169112968), z_dir=(0, -1, 0))) as chamfer_9_piece_2:
        Polygon((CHAMFER_9_SIZE * 0.999621916911, -CHAMFER_9_SIZE * 0.0274958766106), (-CHAMFER_9_SIZE * 0.0274958766106, -CHAMFER_9_SIZE * 0.999621916911), (0, 0), align=None)
    extrude(amount=10.143365976, mode=Mode.SUBTRACT)

    # 草图13 → 凸台-拉伸7 (add)
    with BuildSketch(Plane.XZ.offset(2)):
        with Locations(Location((17.9, -85.000000954, 0), (0, 0, 90))):
            Circle(SKETCH_13_R)
    extrude(amount=EXTRUDE_7_DEPTH)

    # 草图14 → 切除-拉伸14 (cut)
    with BuildSketch(Plane.XZ.offset(3)):
        with Locations(Location((56.4, -93.1, 0), (0, 0, 270))):
            Circle(SKETCH_14_R)
        with Locations(Location((56.4, -3.2, 0), (0, 0, 270))):
            Circle(SKETCH_14_R)
    extrude(amount=-CUT_EXTRUDE_14_DEPTH, mode=Mode.SUBTRACT)

    # 草图15 → 凸台-拉伸8 (add)
    with BuildSketch(Plane(origin=(0, 4, 0), x_dir=(1, 0, 0), z_dir=(0, 1, 0)).offset(EXTRUDE_START_3)):
        with Locations((65.9, 68.75)):
            Rectangle(SKETCH_15_W, SKETCH_15_H)
        with Locations((65.9, 27.75)):
            Rectangle(SKETCH_15_W, SKETCH_15_H)
    extrude(amount=-EXTRUDE_8_DEPTH)

    # 倒角10
    chamfer_10_edges = [part.edges().sort_by_distance(p)[0] for p in [
        (68.4, 2.3, -66.75),
        (68.4, 2.3, -70.75),
        (68.4, 1.5, -68.75),
        (68.4, 2.3, -25.75),
        (68.4, 2.3, -29.75),
        (68.4, 1.5, -27.75),
    ]]
    chamfer(chamfer_10_edges, length=CHAMFER_10_SIZE - 0.0001)  # a hair under: the kernel refuses the full size

    # 倒角11
    # the kernel refuses this chamfer: 0.5 mm, written as the material it adds along each edge
    with BuildSketch(Plane(origin=(67.9, 3.1, -25.75), x_dir=(0.9996219169112968, -0.027495876610586605, 0), z_dir=(0, 0, -1))) as chamfer_11_piece_1_section:
        Polygon((CHAMFER_11_SIZE * 0.999621916911, -CHAMFER_11_SIZE * 0.0274958766106), (-CHAMFER_11_SIZE * 0.0274958766106, -CHAMFER_11_SIZE * 0.999621916911), (0, 0), align=None)
    chamfer_11_piece_1 = extrude(amount=4, mode=Mode.PRIVATE)
    chamfer_11_piece_1 = split(chamfer_11_piece_1, bisect_by=Plane(origin=(68.977946119, 3.269743637, -28.672153881), z_dir=(-0.70710678118655, 0, 0.707106781186545)), keep=Keep.TOP, mode=Mode.PRIVATE)
    chamfer_11_piece_1 = split(chamfer_11_piece_1, bisect_by=Plane(origin=(68.4, 3.269743637, -27.75), z_dir=(-1, 0, 0)), keep=Keep.TOP, mode=Mode.PRIVATE)
    chamfer_11_piece_1 = split(chamfer_11_piece_1, bisect_by=Plane(origin=(68.977946119, 3.269743637, -26.827846119), z_dir=(-0.70710678118655, 0, -0.707106781186545)), keep=Keep.TOP, mode=Mode.PRIVATE)
    add(chamfer_11_piece_1)
    with BuildSketch(Plane(origin=(67.9, 3.1, -66.75), x_dir=(-0.02749587661058217, 0.9996219169112968, 0), z_dir=(0, 0, -1))) as chamfer_11_piece_2_section:
        Polygon((CHAMFER_11_SIZE * 0.999621916911, CHAMFER_11_SIZE * 0.0274958766106), (-CHAMFER_11_SIZE * 0.0274958766106, CHAMFER_11_SIZE * 0.999621916911), (0, 0), align=None)
    chamfer_11_piece_2 = extrude(amount=4, mode=Mode.PRIVATE)
    chamfer_11_piece_2 = split(chamfer_11_piece_2, bisect_by=Plane(origin=(68.977946119, 3.269743637, -69.672153881), z_dir=(-0.7071067811865476, 0, 0.7071067811865476)), keep=Keep.TOP, mode=Mode.PRIVATE)
    chamfer_11_piece_2 = split(chamfer_11_piece_2, bisect_by=Plane(origin=(68.4, 3.269743637, -68.75), z_dir=(-1, 0, 0)), keep=Keep.TOP, mode=Mode.PRIVATE)
    chamfer_11_piece_2 = split(chamfer_11_piece_2, bisect_by=Plane(origin=(68.977946119, 3.269743637, -67.827846119), z_dir=(-0.7071067811865476, 0, -0.7071067811865476)), keep=Keep.TOP, mode=Mode.PRIVATE)
    add(chamfer_11_piece_2)


solid = part.part
